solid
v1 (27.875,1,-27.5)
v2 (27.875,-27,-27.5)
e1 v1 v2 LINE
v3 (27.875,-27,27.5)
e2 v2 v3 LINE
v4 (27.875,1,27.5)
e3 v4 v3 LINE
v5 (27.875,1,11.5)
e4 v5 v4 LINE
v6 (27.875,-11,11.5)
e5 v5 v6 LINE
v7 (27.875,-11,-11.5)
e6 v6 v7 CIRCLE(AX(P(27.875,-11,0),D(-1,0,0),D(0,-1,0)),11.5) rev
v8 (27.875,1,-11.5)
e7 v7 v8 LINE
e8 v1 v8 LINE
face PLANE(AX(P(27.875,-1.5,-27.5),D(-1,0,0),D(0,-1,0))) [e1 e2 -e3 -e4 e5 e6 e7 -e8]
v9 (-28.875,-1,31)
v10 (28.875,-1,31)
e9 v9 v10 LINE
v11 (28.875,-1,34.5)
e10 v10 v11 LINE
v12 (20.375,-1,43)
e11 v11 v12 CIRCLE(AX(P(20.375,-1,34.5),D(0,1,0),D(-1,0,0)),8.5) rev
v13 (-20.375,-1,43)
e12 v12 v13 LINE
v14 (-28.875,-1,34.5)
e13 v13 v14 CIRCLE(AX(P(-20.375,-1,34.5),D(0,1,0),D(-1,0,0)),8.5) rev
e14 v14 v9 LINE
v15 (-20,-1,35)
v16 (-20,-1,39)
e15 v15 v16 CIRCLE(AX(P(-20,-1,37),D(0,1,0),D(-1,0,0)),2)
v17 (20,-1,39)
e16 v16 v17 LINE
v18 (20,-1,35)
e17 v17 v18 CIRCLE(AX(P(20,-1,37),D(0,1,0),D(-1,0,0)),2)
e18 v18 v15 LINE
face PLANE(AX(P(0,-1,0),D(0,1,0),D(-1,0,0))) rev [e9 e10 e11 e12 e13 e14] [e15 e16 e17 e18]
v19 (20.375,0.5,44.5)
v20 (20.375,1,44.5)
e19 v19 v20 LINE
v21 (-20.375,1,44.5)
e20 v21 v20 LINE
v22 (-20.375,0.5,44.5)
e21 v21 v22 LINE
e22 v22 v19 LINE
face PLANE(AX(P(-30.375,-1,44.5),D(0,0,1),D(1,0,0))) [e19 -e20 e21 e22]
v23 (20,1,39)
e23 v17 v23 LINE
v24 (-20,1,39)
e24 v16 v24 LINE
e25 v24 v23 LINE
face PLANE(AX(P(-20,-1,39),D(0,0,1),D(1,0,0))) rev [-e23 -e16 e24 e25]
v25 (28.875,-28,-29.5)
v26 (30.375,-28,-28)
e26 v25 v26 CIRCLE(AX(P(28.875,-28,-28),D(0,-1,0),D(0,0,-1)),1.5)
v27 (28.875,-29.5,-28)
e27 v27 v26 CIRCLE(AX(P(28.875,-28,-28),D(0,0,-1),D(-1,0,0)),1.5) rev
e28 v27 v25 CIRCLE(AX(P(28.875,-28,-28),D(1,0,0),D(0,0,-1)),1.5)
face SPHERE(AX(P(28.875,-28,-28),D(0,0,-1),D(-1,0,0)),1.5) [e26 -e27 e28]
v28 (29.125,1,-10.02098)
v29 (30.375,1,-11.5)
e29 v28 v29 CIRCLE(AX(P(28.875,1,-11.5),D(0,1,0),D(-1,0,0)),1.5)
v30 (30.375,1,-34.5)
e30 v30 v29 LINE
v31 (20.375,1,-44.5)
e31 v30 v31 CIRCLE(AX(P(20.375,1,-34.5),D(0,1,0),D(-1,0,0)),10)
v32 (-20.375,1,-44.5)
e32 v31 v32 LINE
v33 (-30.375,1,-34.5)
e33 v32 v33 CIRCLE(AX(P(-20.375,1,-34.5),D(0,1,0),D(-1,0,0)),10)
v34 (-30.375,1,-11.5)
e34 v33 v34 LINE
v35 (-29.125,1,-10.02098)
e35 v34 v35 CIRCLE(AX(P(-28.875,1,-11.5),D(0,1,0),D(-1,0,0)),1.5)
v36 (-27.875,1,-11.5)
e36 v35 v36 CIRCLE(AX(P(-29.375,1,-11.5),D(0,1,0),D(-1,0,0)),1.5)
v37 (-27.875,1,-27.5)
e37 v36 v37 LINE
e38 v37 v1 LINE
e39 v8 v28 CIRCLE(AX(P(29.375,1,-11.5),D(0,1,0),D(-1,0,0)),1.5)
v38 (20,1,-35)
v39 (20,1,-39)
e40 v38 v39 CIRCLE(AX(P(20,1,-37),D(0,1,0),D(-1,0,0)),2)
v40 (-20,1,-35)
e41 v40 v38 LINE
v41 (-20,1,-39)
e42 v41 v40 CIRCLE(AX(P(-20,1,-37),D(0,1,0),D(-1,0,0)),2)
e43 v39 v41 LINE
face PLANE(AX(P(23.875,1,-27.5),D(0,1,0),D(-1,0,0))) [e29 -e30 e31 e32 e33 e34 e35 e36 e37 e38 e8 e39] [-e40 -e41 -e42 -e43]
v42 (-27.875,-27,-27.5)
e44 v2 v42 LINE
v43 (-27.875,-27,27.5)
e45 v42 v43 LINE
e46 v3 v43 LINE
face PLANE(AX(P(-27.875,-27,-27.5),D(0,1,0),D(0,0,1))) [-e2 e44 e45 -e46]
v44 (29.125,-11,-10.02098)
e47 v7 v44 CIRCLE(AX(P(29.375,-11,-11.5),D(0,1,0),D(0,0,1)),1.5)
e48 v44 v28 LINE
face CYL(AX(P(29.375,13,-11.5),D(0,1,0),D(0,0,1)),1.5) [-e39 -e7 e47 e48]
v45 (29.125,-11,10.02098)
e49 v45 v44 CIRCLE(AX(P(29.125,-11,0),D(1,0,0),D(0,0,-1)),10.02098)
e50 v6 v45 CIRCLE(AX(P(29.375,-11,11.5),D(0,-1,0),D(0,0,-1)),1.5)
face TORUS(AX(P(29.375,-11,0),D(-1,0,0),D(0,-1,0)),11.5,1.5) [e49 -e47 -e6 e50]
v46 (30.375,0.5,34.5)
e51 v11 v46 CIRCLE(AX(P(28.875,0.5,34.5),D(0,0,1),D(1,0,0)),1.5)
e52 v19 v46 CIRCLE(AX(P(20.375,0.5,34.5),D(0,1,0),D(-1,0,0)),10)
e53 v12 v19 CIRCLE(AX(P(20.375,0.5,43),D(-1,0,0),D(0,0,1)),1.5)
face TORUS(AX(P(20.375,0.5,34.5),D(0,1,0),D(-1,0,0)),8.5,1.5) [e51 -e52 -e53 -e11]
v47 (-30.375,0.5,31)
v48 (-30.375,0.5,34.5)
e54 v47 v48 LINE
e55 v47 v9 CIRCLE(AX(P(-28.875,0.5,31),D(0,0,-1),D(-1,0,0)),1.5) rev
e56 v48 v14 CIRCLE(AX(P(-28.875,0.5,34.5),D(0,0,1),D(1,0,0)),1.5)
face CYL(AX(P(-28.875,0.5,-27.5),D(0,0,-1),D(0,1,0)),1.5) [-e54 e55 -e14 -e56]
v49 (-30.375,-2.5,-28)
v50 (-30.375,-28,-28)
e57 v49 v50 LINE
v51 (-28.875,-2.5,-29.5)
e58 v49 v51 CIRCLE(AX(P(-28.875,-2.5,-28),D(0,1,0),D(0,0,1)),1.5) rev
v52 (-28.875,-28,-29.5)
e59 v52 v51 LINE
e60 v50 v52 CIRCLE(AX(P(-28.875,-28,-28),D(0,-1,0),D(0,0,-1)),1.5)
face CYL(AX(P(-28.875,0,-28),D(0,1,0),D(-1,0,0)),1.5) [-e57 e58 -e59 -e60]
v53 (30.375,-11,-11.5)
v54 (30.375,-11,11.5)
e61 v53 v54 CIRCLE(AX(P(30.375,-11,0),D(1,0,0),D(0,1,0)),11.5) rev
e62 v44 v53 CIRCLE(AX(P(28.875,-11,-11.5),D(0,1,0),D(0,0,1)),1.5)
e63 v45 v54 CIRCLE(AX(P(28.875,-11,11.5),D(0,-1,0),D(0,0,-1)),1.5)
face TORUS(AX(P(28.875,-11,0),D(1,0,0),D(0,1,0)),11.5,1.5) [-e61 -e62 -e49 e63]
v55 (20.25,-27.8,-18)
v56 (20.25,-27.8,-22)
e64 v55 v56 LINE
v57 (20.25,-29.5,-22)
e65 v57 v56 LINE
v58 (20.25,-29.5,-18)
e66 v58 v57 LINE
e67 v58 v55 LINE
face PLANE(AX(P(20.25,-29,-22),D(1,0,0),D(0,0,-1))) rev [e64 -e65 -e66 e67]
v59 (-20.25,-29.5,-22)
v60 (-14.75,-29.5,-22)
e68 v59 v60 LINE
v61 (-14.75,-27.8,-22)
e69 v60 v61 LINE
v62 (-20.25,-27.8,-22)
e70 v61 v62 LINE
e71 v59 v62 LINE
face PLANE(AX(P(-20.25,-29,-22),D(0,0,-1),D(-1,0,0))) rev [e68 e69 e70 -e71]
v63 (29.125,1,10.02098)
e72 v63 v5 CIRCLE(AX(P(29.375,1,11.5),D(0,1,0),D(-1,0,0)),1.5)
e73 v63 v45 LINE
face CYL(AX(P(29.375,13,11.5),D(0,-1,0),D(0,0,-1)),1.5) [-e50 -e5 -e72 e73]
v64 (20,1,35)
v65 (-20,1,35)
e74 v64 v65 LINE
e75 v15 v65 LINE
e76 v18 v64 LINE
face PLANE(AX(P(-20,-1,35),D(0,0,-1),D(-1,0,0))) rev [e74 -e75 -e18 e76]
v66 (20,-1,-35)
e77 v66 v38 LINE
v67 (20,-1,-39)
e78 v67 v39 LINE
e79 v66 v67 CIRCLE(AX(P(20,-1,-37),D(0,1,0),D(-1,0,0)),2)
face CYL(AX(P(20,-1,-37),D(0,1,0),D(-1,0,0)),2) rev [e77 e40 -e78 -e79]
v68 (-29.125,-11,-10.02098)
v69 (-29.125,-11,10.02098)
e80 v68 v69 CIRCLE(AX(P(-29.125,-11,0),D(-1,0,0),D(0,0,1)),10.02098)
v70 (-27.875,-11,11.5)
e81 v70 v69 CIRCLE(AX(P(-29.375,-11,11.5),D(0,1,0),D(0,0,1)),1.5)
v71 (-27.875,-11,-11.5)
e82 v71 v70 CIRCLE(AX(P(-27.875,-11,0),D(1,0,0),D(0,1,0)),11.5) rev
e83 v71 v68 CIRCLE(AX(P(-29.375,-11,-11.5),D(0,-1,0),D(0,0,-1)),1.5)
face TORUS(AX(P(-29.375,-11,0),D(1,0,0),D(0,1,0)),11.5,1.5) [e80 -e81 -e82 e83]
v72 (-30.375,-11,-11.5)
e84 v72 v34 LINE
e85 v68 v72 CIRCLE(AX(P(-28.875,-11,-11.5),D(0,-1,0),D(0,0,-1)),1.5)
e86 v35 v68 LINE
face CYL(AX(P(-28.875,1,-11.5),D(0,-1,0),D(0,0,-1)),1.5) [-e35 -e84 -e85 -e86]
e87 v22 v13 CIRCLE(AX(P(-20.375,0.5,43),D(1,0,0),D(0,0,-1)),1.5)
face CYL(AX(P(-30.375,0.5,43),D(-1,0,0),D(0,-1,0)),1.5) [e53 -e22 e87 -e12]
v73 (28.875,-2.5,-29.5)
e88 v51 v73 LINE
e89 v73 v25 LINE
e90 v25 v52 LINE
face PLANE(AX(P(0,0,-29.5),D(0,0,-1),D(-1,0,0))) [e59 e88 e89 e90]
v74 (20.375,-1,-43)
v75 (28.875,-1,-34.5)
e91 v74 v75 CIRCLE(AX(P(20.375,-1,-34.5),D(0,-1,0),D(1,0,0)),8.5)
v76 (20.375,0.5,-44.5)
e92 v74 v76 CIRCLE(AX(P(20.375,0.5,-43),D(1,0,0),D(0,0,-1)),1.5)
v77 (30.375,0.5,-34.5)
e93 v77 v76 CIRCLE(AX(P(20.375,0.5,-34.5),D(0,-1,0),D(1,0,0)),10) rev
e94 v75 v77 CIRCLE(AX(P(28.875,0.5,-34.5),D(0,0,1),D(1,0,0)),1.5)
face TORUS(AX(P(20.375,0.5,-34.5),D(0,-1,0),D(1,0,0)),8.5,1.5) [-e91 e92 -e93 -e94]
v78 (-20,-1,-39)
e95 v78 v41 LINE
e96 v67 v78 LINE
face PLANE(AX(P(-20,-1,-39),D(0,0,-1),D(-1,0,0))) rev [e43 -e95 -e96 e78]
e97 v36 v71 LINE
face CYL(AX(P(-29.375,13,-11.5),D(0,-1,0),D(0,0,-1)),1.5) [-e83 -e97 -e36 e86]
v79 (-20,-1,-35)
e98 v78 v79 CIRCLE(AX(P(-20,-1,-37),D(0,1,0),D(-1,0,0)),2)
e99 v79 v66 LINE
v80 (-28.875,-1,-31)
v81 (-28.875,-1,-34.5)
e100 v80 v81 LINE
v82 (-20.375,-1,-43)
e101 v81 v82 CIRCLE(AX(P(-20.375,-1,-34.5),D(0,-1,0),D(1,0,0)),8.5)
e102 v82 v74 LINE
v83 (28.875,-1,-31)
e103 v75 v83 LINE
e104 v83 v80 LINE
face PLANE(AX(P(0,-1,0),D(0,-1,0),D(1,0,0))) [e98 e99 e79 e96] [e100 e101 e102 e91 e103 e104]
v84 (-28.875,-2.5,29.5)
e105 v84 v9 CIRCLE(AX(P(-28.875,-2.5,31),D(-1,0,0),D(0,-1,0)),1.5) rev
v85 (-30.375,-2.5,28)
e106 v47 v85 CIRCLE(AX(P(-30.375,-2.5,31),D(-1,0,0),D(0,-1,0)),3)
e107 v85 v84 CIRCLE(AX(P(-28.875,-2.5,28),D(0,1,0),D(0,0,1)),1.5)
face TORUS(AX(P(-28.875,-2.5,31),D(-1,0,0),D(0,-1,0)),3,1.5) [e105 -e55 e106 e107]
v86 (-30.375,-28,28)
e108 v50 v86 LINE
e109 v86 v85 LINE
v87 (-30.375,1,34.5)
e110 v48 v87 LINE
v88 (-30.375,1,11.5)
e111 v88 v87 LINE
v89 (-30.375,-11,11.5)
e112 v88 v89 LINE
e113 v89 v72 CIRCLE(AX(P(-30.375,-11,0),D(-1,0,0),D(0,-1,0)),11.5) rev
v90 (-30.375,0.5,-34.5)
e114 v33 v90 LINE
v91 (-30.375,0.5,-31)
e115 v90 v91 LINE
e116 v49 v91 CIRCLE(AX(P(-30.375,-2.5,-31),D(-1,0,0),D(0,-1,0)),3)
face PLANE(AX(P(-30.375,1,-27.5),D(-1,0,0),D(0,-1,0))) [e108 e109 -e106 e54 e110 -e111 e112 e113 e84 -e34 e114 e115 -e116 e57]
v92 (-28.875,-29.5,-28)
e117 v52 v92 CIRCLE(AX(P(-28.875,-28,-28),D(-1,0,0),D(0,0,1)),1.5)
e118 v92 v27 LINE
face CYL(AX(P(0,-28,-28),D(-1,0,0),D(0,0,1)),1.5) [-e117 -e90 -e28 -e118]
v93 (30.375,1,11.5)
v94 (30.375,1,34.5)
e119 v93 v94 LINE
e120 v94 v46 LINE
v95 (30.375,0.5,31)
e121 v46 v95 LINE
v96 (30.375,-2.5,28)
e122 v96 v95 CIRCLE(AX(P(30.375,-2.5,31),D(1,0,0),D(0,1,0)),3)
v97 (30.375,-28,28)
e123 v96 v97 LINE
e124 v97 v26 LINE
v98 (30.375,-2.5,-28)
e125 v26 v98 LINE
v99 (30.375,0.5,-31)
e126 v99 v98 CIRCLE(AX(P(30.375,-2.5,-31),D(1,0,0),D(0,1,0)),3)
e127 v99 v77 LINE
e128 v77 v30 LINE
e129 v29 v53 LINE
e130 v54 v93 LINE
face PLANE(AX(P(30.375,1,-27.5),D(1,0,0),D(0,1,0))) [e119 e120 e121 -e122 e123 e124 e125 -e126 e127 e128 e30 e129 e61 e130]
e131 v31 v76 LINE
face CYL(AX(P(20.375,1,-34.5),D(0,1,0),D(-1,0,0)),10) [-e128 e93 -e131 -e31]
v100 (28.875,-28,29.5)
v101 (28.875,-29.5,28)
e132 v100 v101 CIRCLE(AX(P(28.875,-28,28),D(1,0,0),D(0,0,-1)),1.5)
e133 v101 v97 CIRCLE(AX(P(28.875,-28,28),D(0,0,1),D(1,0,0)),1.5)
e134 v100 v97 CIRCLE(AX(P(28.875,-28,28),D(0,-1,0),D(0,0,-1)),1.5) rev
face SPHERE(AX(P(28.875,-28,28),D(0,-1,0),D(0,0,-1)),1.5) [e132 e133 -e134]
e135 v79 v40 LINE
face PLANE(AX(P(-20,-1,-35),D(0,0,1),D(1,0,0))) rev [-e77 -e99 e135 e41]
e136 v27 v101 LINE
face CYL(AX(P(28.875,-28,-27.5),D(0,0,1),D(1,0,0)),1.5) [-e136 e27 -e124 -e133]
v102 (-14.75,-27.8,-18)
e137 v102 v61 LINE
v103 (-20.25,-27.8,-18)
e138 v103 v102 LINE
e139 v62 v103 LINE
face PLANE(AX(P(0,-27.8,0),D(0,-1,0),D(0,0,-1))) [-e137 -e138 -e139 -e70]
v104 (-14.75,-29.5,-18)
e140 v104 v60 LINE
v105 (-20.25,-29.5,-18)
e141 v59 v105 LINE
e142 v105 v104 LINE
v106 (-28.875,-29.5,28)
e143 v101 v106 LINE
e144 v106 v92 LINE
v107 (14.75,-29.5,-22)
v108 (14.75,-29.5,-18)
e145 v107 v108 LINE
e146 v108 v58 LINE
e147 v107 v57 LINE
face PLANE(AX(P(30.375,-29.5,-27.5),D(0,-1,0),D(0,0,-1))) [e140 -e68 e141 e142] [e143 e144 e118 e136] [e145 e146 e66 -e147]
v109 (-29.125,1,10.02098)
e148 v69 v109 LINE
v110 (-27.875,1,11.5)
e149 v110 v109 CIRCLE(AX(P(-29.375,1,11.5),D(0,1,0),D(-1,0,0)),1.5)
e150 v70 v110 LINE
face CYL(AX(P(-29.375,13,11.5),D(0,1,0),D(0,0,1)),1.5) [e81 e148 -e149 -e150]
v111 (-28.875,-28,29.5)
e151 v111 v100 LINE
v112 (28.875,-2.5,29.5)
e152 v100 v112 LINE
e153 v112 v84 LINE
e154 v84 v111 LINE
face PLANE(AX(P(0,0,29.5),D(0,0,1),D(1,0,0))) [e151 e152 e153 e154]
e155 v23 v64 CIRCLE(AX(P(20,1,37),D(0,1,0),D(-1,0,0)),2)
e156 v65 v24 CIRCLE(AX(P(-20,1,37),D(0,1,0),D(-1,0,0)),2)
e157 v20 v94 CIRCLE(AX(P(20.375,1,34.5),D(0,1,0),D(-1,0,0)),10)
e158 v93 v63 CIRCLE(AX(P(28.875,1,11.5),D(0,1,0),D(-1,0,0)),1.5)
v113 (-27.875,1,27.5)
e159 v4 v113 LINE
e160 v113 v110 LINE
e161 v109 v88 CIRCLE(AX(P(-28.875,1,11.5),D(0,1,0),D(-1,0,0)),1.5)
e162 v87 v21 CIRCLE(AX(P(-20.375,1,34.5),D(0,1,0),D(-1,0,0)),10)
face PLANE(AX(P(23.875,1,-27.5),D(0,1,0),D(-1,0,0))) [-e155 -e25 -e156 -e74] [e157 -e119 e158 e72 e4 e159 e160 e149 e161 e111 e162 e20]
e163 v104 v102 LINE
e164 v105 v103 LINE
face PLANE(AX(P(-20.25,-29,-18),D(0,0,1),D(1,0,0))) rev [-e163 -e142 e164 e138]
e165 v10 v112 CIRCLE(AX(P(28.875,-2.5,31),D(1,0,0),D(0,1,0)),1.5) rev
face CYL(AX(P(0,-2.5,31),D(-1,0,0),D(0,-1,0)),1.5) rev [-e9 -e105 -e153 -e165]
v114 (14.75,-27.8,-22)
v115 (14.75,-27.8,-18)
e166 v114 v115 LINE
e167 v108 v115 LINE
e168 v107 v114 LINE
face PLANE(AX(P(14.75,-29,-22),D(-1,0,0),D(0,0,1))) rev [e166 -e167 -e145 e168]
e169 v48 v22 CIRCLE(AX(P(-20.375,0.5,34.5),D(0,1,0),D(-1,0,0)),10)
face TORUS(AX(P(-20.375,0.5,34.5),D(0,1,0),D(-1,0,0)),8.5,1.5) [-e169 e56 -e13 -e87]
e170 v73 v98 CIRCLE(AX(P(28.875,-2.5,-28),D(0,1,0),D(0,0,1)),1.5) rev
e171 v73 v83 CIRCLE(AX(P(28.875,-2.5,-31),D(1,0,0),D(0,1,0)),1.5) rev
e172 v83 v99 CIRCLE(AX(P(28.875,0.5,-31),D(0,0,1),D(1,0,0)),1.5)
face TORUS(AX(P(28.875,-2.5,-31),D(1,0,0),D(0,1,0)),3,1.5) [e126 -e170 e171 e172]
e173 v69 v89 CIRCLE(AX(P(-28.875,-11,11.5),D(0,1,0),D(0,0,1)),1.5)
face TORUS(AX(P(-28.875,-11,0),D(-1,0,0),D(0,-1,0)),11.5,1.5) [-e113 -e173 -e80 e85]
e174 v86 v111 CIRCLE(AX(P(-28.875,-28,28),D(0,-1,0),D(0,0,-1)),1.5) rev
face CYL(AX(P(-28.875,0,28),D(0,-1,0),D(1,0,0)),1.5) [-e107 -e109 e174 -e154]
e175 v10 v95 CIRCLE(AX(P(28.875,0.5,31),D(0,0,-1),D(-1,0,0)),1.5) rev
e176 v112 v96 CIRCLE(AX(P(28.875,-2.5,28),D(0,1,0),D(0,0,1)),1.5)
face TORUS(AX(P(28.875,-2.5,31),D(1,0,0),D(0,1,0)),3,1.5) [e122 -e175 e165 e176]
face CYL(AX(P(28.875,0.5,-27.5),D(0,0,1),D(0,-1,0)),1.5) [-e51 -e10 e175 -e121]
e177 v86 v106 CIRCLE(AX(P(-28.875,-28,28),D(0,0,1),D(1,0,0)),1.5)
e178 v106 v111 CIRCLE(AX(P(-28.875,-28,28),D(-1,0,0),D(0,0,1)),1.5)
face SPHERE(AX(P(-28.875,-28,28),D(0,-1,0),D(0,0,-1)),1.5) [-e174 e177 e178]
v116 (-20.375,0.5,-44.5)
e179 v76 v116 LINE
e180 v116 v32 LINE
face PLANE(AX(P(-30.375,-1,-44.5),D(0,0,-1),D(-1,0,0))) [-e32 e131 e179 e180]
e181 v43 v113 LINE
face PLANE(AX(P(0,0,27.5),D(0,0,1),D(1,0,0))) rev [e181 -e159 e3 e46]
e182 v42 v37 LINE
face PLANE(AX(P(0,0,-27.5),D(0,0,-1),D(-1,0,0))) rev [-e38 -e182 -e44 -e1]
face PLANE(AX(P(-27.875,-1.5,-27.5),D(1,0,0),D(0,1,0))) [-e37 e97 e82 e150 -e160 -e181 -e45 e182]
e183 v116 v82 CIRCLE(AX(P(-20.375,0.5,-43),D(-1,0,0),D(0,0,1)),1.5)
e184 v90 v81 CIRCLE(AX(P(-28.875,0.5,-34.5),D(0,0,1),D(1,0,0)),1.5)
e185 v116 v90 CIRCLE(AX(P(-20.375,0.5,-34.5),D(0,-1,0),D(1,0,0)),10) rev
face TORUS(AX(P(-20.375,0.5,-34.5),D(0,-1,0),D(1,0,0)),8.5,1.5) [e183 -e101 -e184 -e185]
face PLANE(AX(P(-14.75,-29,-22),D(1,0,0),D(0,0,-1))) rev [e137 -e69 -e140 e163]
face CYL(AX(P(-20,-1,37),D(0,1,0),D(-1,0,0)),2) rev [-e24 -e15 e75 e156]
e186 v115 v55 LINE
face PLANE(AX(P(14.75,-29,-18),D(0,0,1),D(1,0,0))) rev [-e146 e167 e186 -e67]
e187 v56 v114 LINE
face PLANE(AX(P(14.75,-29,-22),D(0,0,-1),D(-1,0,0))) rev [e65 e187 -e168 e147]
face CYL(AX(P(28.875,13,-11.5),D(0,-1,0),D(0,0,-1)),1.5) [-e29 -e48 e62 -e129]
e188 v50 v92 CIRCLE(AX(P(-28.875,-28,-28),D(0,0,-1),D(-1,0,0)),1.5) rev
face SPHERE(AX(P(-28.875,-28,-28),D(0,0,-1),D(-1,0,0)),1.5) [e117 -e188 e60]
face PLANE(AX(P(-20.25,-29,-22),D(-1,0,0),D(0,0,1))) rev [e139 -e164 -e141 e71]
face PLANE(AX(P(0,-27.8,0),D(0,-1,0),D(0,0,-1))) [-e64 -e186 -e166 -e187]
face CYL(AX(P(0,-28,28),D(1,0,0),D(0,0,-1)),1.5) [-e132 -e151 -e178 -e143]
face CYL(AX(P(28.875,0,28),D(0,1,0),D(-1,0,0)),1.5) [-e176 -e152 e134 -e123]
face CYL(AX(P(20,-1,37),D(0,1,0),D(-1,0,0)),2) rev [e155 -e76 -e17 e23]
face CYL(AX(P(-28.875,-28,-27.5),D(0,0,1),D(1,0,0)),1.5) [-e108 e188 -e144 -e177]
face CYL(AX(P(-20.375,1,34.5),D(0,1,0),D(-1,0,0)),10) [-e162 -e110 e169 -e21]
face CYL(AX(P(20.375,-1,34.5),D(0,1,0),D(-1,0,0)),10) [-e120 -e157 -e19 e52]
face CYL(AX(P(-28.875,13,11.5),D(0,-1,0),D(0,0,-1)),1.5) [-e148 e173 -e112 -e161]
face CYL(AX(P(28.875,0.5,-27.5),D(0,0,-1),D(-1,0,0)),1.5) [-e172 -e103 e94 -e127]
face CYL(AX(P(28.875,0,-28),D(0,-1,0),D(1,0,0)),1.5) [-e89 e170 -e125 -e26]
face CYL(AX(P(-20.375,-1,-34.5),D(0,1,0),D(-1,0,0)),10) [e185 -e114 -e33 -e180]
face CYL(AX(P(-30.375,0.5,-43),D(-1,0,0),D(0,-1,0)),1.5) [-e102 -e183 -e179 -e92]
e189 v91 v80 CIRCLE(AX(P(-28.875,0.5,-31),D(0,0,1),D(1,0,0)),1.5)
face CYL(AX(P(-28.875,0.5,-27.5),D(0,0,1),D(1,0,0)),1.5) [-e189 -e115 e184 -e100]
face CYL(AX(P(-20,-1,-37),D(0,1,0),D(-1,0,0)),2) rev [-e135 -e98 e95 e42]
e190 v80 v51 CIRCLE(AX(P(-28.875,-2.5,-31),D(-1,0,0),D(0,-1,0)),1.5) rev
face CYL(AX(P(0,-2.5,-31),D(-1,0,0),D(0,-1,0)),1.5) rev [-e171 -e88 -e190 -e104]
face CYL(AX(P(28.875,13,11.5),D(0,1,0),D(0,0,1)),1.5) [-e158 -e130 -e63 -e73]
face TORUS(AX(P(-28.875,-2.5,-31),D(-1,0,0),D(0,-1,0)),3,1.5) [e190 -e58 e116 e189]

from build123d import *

# Parameters (mm, degrees)
BOSS_EXTRUDE1_DEPTH      = 27.5
BOSS_EXTRUDE1_DEPTH_BACK = 27.5
SKETCH3_W                = 60.75
SKETCH3_H                = 30.5
BOSS_EXTRUDE2_DEPTH      = 2
SKETCH4_W                = 55.75
SKETCH4_H                = 55
CUT_EXTRUDE1_DEPTH       = 50
SKETCH5_W                = 60.75
SKETCH5_H                = 30.5
BOSS_EXTRUDE3_DEPTH      = 2
SKETCH7_W                = 5.5
SKETCH7_H                = 4
CUT_EXTRUDE2_DEPTH       = 2
SKETCH8_W                = 60.75
SKETCH8_H                = 15
BOSS_EXTRUDE5_DEPTH      = 2
FILLET2_R                = 10
CUT_EXTRUDE3_DEPTH       = 62.425895394
CUT_EXTRUDE3_DEPTH_BACK  = 62.425895394
SKETCH10_W               = 5.5
SKETCH10_H               = 5.017361003
CUT_EXTRUDE4_DEPTH       = 4
DELETEFACE1_START        = -29
DELETEFACE1_OUTLINE_W    = 5.5
DELETEFACE1_OUTLINE_H    = 4
DELETEFACE1_DEPTH        = 2
SKETCH11_W               = 46.425527042
SKETCH11_H               = 17.437880889
BOSS_EXTRUDE6_DEPTH      = 0.8
FILLET3_R                = 1.5


# Read off the part's stored shape, not the designer's step: DeleteFace1
with BuildPart() as part:
    # Sketch2 → Boss-Extrude1 (new, two sides: drawn at the far end of the back side and taken through both)
    with BuildSketch(Plane.XY.offset(-BOSS_EXTRUDE1_DEPTH_BACK)):
        Polygon((-23.875, -1.5), (-27.875, -1.5), (-27.875, -27), (0, -27), (27.875, -27), (27.875, -1.5), (23.875, -1.5), (23.875, 1), (30.375, 1), (30.375, -29.5), (0, -29.5), (-30.375, -29.5), (-30.375, 1), (-23.875, 1), align=None)
    extrude(amount=BOSS_EXTRUDE1_DEPTH + BOSS_EXTRUDE1_DEPTH_BACK)

    # Sketch3 → Boss-Extrude2 (add)
    with BuildSketch(Plane(origin=(0, 0, -27.5), x_dir=(-1, 0, 0), z_dir=(0, 0, -1))):
        with Locations((0, -14.25)):
            Rectangle(SKETCH3_W, SKETCH3_H)
    extrude(amount=BOSS_EXTRUDE2_DEPTH)

    # Sketch4 → Cut-Extrude1 (cut)
    with BuildSketch(Plane(origin=(0, -27, 0), x_dir=(1, 0, 0), z_dir=(0, 1, 0))):
        Rectangle(SKETCH4_W, SKETCH4_H)
    extrude(amount=CUT_EXTRUDE1_DEPTH, mode=Mode.SUBTRACT)

    # Sketch5 → Boss-Extrude3 (add)
    with BuildSketch(Plane.XY.offset(27.5)):
        with Locations((0, -14.25)):
            Rectangle(SKETCH5_W, SKETCH5_H)
    extrude(amount=BOSS_EXTRUDE3_DEPTH)

    # Sketch7 → Cut-Extrude2 (cut)
    with BuildSketch(Plane(origin=(0, -27, 0), x_dir=(1, 0, 0), z_dir=(0, 1, 0))):
        with Locations((0, 20)):
            Rectangle(SKETCH7_W, SKETCH7_H)
        with Locations((17.5, 20)):
            Rectangle(SKETCH7_W, SKETCH7_H)
        with Locations((-17.5, 20)):
            Rectangle(SKETCH7_W, SKETCH7_H)
    extrude(amount=-CUT_EXTRUDE2_DEPTH, mode=Mode.SUBTRACT)

    # Sketch8 → Boss-Extrude5 (add)
    # profile 1 of 2: a face of its own
    with BuildSketch(Plane(origin=(0, 1, 0), x_dir=(1, 0, 0), z_dir=(0, 1, 0))):
        with Locations((0, 37)):
            Rectangle(SKETCH8_W, SKETCH8_H)
        with BuildLine():
            Line((-20, 39), (20, 39))
            ThreePointArc((20, 39), (22, 37), (20, 35))
            Line((20, 35), (-20, 35))
            ThreePointArc((-20, 35), (-22, 37), (-20, 39))
        make_face(mode=Mode.SUBTRACT)
    # profile 2 of 2: a face of its own
    with BuildSketch(Plane(origin=(0, 1, 0), x_dir=(1, 0, 0), z_dir=(0, 1, 0))):
        with Locations((0, -37)):
            Rectangle(SKETCH8_W, SKETCH8_H)
        with BuildLine():
            Line((-20, -35), (20, -35))
            ThreePointArc((20, -35), (22, -37), (20, -39))
            Line((20, -39), (-20, -39))
            ThreePointArc((-20, -39), (-22, -37), (-20, -35))
        make_face(mode=Mode.SUBTRACT)
    extrude(amount=-BOSS_EXTRUDE5_DEPTH)

    # Fillet2
    fillet2_edges = [part.edges().sort_by_distance(p)[0] for p in [
        (-30.375, 0, -44.5),
        (30.375, 0, -44.5),
        (-30.375, 0, 44.5),
        (30.375, 0, 44.5),
    ]]
    fillet(fillet2_edges, radius=FILLET2_R)

    # Sketch9 → Cut-Extrude3 (cut, two sides: drawn at the far end of the back side and taken through both)
    with BuildSketch(Plane(origin=(0, 0, 0), x_dir=(0, 0, -1), z_dir=(1, 0, 0)).offset(-CUT_EXTRUDE3_DEPTH_BACK)):
        with BuildLine():
            Line((10, 13), (10, -11))
            ThreePointArc((10, -11), (0, -21), (-10, -11))
            Line((-10, -11), (-10, 13))
            ThreePointArc((-10, 13), (0, 23), (10, 13))
        make_face()
    extrude(amount=CUT_EXTRUDE3_DEPTH + CUT_EXTRUDE3_DEPTH_BACK, mode=Mode.SUBTRACT)

    # Sketch10 → Cut-Extrude4 (cut)
    with BuildSketch(Plane(origin=(0, 0, -18), x_dir=(-1, 0, 0), z_dir=(0, 0, -1))):
        with Locations((17.5, -30.308680501)):
            Rectangle(SKETCH10_W, SKETCH10_H)
        with Locations((-17.5, -30.308680501)):
            Rectangle(SKETCH10_W, SKETCH10_H)
    extrude(amount=CUT_EXTRUDE4_DEPTH, mode=Mode.SUBTRACT)

    # DeleteFace1 outline → DeleteFace1 (add)
    with BuildSketch(Plane(origin=(0, 0, 0), x_dir=(1, 0, 0), z_dir=(0, 1, 0)).offset(DELETEFACE1_START)):
        with Locations((0, 20)):
            Rectangle(DELETEFACE1_OUTLINE_W, DELETEFACE1_OUTLINE_H)
    extrude(amount=DELETEFACE1_DEPTH)

    # Sketch11 → Boss-Extrude6 (add)
    with BuildSketch(Plane(origin=(0, -27, 0), x_dir=(1, 0, 0), z_dir=(0, 1, 0))):
        with Locations((0, 15.626153005)):
            Rectangle(SKETCH11_W, SKETCH11_H)
    extrude(amount=-BOSS_EXTRUDE6_DEPTH)

    # Fillet3
    # the kernel refuses this fillet: 1.5 mm, written as the material it adds along each edge
    with BuildSketch(Plane(origin=(-30.375, -1, 29.5), x_dir=(0, 0, 1), z_dir=(1, 0, 0)), Plane(origin=(-30.375, -1, -29.5), x_dir=(0, -1, 0), z_dir=(1, 0, 0))) as fillet3_piece_1:
        with BuildLine():
            CenterArc((FILLET3_R, FILLET3_R), FILLET3_R, 180, 90)
            Line((0, FILLET3_R), (0, 0))
            Line((0, 0), (FILLET3_R, 0))
        make_face()
    extrude(amount=60.75)
    # the kernel refuses this fillet: 1.5 mm, written as the material it takes off along each edge
    with BuildSketch(Plane(origin=(-30.375, -29.5, -33.25), x_dir=(0, 1, 0), z_dir=(0, 0, 1)), Plane(origin=(30.375, -29.5, 33.25), x_dir=(0, 1, 0), z_dir=(0, 0, -1))) as fillet3_2_piece_1:
        with BuildLine():
            CenterArc((FILLET3_R, -FILLET3_R), FILLET3_R, 90, 90)
            Line((0, -FILLET3_R), (0, 0))
            Line((0, 0), (FILLET3_R, 0))
        make_face()
    extrude(amount=66.5, mode=Mode.SUBTRACT)
    with BuildSketch(Plane(origin=(34.125, -29.5, 29.5), x_dir=(0, 1, 0), z_dir=(-1, 0, 0))) as fillet3_2_piece_2:
        with BuildLine():
            CenterArc((FILLET3_R, FILLET3_R), FILLET3_R, 180, 90)
            Line((0, FILLET3_R), (0, 0))
            Line((0, 0), (FILLET3_R, 0))
        make_face()
    extrude(amount=68.25, mode=Mode.SUBTRACT)
    with BuildSketch(Plane(origin=(-34.125, -29.5, -29.5), x_dir=(0, 0, 1), z_dir=(1, 0, 0))) as fillet3_2_piece_3:
        with BuildLine():
            CenterArc((FILLET3_R, -FILLET3_R), FILLET3_R, 90, 90)
            Line((0, -FILLET3_R), (0, 0))
            Line((0, 0), (FILLET3_R, 0))
        make_face()
    extrude(amount=68.25, mode=Mode.SUBTRACT)
    with BuildSketch(Plane(origin=(-30.375, -11, 10), x_dir=(0, 0, 1), z_dir=(0, 1, 0)), Plane(origin=(-30.375, 4.75, -10), x_dir=(0, 0, -1), z_dir=(0, -1, 0)), Plane(origin=(30.375, -11, -10), x_dir=(0, 0, -1), z_dir=(0, 1, 0)), Plane(origin=(-27.875, -11, -10), x_dir=(0, 0, -1), z_dir=(0, 1, 0)), Plane(origin=(27.875, 4.75, -10), x_dir=(0, 0, -1), z_dir=(0, -1, 0)), Plane(origin=(27.875, -11, 10), x_dir=(0, 0, 1), z_dir=(0, 1, 0))) as fillet3_2_piece_4:
        with BuildLine():
            CenterArc((FILLET3_R, FILLET3_R), FILLET3_R, 180, 90)
            Line((0, FILLET3_R), (0, 0))
            Line((0, 0), (FILLET3_R, 0))
        make_face()
    extrude(amount=15.75, mode=Mode.SUBTRACT)
    with BuildSketch(Plane(origin=(30.375, 4.75, 10), x_dir=(-1, 0, 0), z_dir=(0, -1, 0)), Plane(origin=(-27.875, 4.75, 10), x_dir=(-1, 0, 0), z_dir=(0, -1, 0))) as fillet3_2_piece_5:
        with BuildLine():
            CenterArc((FILLET3_R, -FILLET3_R), FILLET3_R, 90, 90)
            Line((0, -FILLET3_R), (0, 0))
            Line((0, 0), (FILLET3_R, 0))
        make_face()
    extrude(amount=15.75, mode=Mode.SUBTRACT)
    with BuildSketch(Plane(origin=(-30.375, -11, 0), x_dir=(0, 0, -1), z_dir=(0, 1, 0))) as fillet3_2_piece_6:
        with BuildLine():
            CenterArc((10 + FILLET3_R, -FILLET3_R), FILLET3_R, 90, 90)
            Line((10, -FILLET3_R), (10, 0))
            Line((10, 0), (10 + FILLET3_R, 0))
        make_face()
    revolve(axis=Axis((-30.375, -11, 0), (-1, 0, 0)), revolution_arc=180, mode=Mode.SUBTRACT)
    with BuildSketch(Plane(origin=(30.375, -11, 0), x_dir=(0, 0, -1), z_dir=(0, 1, 0))) as fillet3_2_piece_7:
        with BuildLine():
            CenterArc((10 + FILLET3_R, FILLET3_R), FILLET3_R, 180, 90)
            Line((10, FILLET3_R), (10, 0))
            Line((10, 0), (10 + FILLET3_R, 0))
        make_face()
    revolve(axis=Axis((30.375, -11, 0), (-1, 0, 0)), revolution_arc=180, mode=Mode.SUBTRACT)
    with BuildSketch(Plane(origin=(-27.875, -11, 0), x_dir=(0, 0, -1), z_dir=(0, 1, 0))) as fillet3_2_piece_8:
        with BuildLine():
            CenterArc((10 + FILLET3_R, FILLET3_R), FILLET3_R, 180, 90)
            Line((10, FILLET3_R), (10, 0))
            Line((10, 0), (10 + FILLET3_R, 0))
        make_face()
    revolve(axis=Axis((-27.875, -11, 0), (-1, 0, 0)), revolution_arc=180, mode=Mode.SUBTRACT)
    with BuildSketch(Plane(origin=(27.875, -11, 0), x_dir=(0, 0, -1), z_dir=(0, 1, 0))) as fillet3_2_piece_9:
        with BuildLine():
            CenterArc((10 + FILLET3_R, -FILLET3_R), FILLET3_R, 90, 90)
            Line((10, -FILLET3_R), (10, 0))
            Line((10, 0), (10 + FILLET3_R, 0))
        make_face()
    revolve(axis=Axis((27.875, -11, 0), (-1, 0, 0)), revolution_arc=180, mode=Mode.SUBTRACT)
    # the kernel refuses this fillet: 1.5 mm, written as the material it takes off along each edge
    with BuildSketch(Plane(origin=(28.875, -28, -28), x_dir=(0, 0, -1), z_dir=(1, 0, 0))) as fillet3_3_piece_1_section:
        Polygon((0, 0), (FILLET3_R, 0), (FILLET3_R, -FILLET3_R), (0, -FILLET3_R), align=None)
    fillet3_3_piece_1 = extrude(amount=FILLET3_R, mode=Mode.PRIVATE)
    fillet3_3_piece_1 = fillet3_3_piece_1 - Plane(origin=(28.875, -28, -28), x_dir=(0, 0.7071067811865475, 0.7071067811865475), z_dir=(1, 0, 0)) * Sphere(FILLET3_R, mode=Mode.PRIVATE)
    add(fillet3_3_piece_1, mode=Mode.SUBTRACT)
    with BuildSketch(Plane(origin=(28.875, -28, 28), x_dir=(0, 0, 1), z_dir=(1, 0, 0))) as fillet3_3_piece_2_section:
        Polygon((0, 0), (FILLET3_R, 0), (FILLET3_R, FILLET3_R), (0, FILLET3_R), align=None)
    fillet3_3_piece_2 = extrude(amount=FILLET3_R, mode=Mode.PRIVATE)
    fillet3_3_piece_2 = fillet3_3_piece_2 - Plane(origin=(28.875, -28, 28), x_dir=(0, 0.7071067811865475, -0.7071067811865475), z_dir=(1, 0, 0)) * Sphere(FILLET3_R, mode=Mode.PRIVATE)
    add(fillet3_3_piece_2, mode=Mode.SUBTRACT)
    with BuildSketch(Plane(origin=(-28.875, -28, -28), x_dir=(0, 0, -1), z_dir=(-1, 0, 0))) as fillet3_3_piece_3_section:
        Polygon((0, 0), (FILLET3_R, 0), (FILLET3_R, FILLET3_R), (0, FILLET3_R), align=None)
    fillet3_3_piece_3 = extrude(amount=FILLET3_R, mode=Mode.PRIVATE)
    fillet3_3_piece_3 = fillet3_3_piece_3 - Plane(origin=(-28.875, -28, -28), x_dir=(0, 0.7071067811865475, 0.7071067811865475), z_dir=(-1, 0, 0)) * Sphere(FILLET3_R, mode=Mode.PRIVATE)
    add(fillet3_3_piece_3, mode=Mode.SUBTRACT)
    with BuildSketch(Plane(origin=(-28.875, -28, 28), x_dir=(0, 0, 1), z_dir=(-1, 0, 0))) as fillet3_3_piece_4_section:
        Polygon((0, 0), (FILLET3_R, 0), (FILLET3_R, -FILLET3_R), (0, -FILLET3_R), align=None)
    fillet3_3_piece_4 = extrude(amount=FILLET3_R, mode=Mode.PRIVATE)
    fillet3_3_piece_4 = fillet3_3_piece_4 - Plane(origin=(-28.875, -28, 28), x_dir=(0, 0.7071067811865475, -0.7071067811865475), z_dir=(-1, 0, 0)) * Sphere(FILLET3_R, mode=Mode.PRIVATE)
    add(fillet3_3_piece_4, mode=Mode.SUBTRACT)
    with BuildSketch(Plane(origin=(20.375, -1, 44.5), x_dir=(0, 1, 0), z_dir=(-1, 0, 0)), Plane(origin=(20.375, -1, -44.5), x_dir=(0, 0, 1), z_dir=(-1, 0, 0))) as fillet3_3_piece_5:
        with BuildLine():
            CenterArc((FILLET3_R, FILLET3_R), FILLET3_R, 180, 90)
            Line((0, FILLET3_R), (0, 0))
            Line((0, 0), (FILLET3_R, 0))
        make_face()
    extrude(amount=40.75, mode=Mode.SUBTRACT)
    with BuildSketch(Plane(origin=(-20.375, -1, 34.5), x_dir=(-1, 0, 0), z_dir=(0, 0, -1))) as fillet3_3_piece_6:
        with BuildLine():
            CenterArc((10 - FILLET3_R, FILLET3_R), FILLET3_R, 270, 90)
            Line((10 - FILLET3_R, 0), (10, 0))
            Line((10, 0), (10, FILLET3_R))
        make_face()
    revolve(axis=Axis((-20.375, -1, 34.5), (0, 1, 0)), revolution_arc=90, mode=Mode.SUBTRACT)
    with BuildSketch(Plane(origin=(-20.375, -1, -34.5), x_dir=(-1, 0, 0), z_dir=(0, 0, 1))) as fillet3_3_piece_7:
        with BuildLine():
            CenterArc((10 - FILLET3_R, -FILLET3_R), FILLET3_R, 0, 90)
            Line((10, -FILLET3_R), (10, 0))
            Line((10, 0), (10 - FILLET3_R, 0))
        make_face()
    revolve(axis=Axis((-20.375, -1, -34.5), (0, -1, 0)), revolution_arc=90, mode=Mode.SUBTRACT)
    with BuildSketch(Plane(origin=(20.375, -1, 34.5), x_dir=(1, 0, 0), z_dir=(0, 0, -1))) as fillet3_3_piece_8:
        with BuildLine():
            CenterArc((10 - FILLET3_R, -FILLET3_R), FILLET3_R, 0, 90)
            Line((10 - FILLET3_R, 0), (10, 0))
            Line((10, 0), (10, -FILLET3_R))
        make_face()
    revolve(axis=Axis((20.375, -1, 34.5), (0, -1, 0)), revolution_arc=90, mode=Mode.SUBTRACT)
    with BuildSketch(Plane(origin=(-30.375, -1, 34.5), x_dir=(0, 1, 0), z_dir=(0, 0, -1)), Plane(origin=(30.375, -1, 31), x_dir=(0, 1, 0), z_dir=(0, 0, 1))) as fillet3_3_piece_9:
        with BuildLine():
            CenterArc((FILLET3_R, FILLET3_R), FILLET3_R, 180, 90)
            Line((0, FILLET3_R), (0, 0))
            Line((0, 0), (FILLET3_R, 0))
        make_face()
    extrude(amount=3.5, mode=Mode.SUBTRACT)
    with BuildSketch(Plane(origin=(-30.375, -1, -34.5), x_dir=(0, 1, 0), z_dir=(0, 0, 1)), Plane(origin=(30.375, -1, -31), x_dir=(0, 1, 0), z_dir=(0, 0, -1))) as fillet3_3_piece_10:
        with BuildLine():
            CenterArc((FILLET3_R, -FILLET3_R), FILLET3_R, 90, 90)
            Line((0, -FILLET3_R), (0, 0))
            Line((0, 0), (FILLET3_R, 0))
        make_face()
    extrude(amount=3.5, mode=Mode.SUBTRACT)
    with BuildSketch(Plane(origin=(20.375, -1, -34.5), x_dir=(0, 0, -1), z_dir=(-1, 0, 0))) as fillet3_3_piece_11:
        with BuildLine():
            CenterArc((10 - FILLET3_R, -FILLET3_R), FILLET3_R, 0, 90)
            Line((10, -FILLET3_R), (10, 0))
            Line((10, 0), (10 - FILLET3_R, 0))
        make_face()
    revolve(axis=Axis((20.375, -1, -34.5), (0, -1, 0)), revolution_arc=90, mode=Mode.SUBTRACT)
    with BuildSketch(Plane(origin=(-30.375, -28, 29.5), x_dir=(0, 0, -1), z_dir=(0, 1, 0)), Plane(origin=(-30.375, -2.5, -29.5), x_dir=(0, 0, 1), z_dir=(0, -1, 0)), Plane(origin=(30.375, -2.5, 29.5), x_dir=(0, 0, -1), z_dir=(0, -1, 0)), Plane(origin=(30.375, -28, -29.5), x_dir=(0, 0, 1), z_dir=(0, 1, 0))) as fillet3_3_piece_12:
        with BuildLine():
            CenterArc((FILLET3_R, -FILLET3_R), FILLET3_R, 90, 90)
            Line((0, -FILLET3_R), (0, 0))
            Line((0, 0), (FILLET3_R, 0))
        make_face()
    extrude(amount=25.5, mode=Mode.SUBTRACT)
    with BuildSketch(Plane(origin=(30.375, -2.5, -31), x_dir=(0, 0, 1), z_dir=(0, -1, 0))) as fillet3_3_piece_13:
        with BuildLine():
            CenterArc((1.5 + FILLET3_R, FILLET3_R), FILLET3_R, 180, 90)
            Line((1.5, FILLET3_R), (1.5, 0))
            Line((1.5, 0), (1.5 + FILLET3_R, 0))
        make_face()
    revolve(axis=Axis((30.375, -2.5, -31), (-1, 0, 0)), revolution_arc=90, mode=Mode.SUBTRACT)
    with BuildSketch(Plane(origin=(30.375, -2.5, 31), x_dir=(0, 1, 0), z_dir=(0, 0, 1))) as fillet3_3_piece_14:
        with BuildLine():
            CenterArc((1.5 + FILLET3_R, FILLET3_R), FILLET3_R, 180, 90)
            Line((1.5, FILLET3_R), (1.5, 0))
            Line((1.5, 0), (1.5 + FILLET3_R, 0))
        make_face()
    revolve(axis=Axis((30.375, -2.5, 31), (-1, 0, 0)), revolution_arc=90, mode=Mode.SUBTRACT)
    with BuildSketch(Plane(origin=(-30.375, -2.5, -31), x_dir=(0, 0, 1), z_dir=(0, -1, 0))) as fillet3_3_piece_15:
        with BuildLine():
            CenterArc((1.5 + FILLET3_R, -FILLET3_R), FILLET3_R, 90, 90)
            Line((1.5, -FILLET3_R), (1.5, 0))
            Line((1.5, 0), (1.5 + FILLET3_R, 0))
        make_face()
    revolve(axis=Axis((-30.375, -2.5, -31), (-1, 0, 0)), revolution_arc=90, mode=Mode.SUBTRACT)
    with BuildSketch(Plane(origin=(-30.375, -2.5, 31), x_dir=(0, 1, 0), z_dir=(0, 0, 1))) as fillet3_3_piece_16:
        with BuildLine():
            CenterArc((1.5 + FILLET3_R, -FILLET3_R), FILLET3_R, 90, 90)
            Line((1.5, -FILLET3_R), (1.5, 0))
            Line((1.5, 0), (1.5 + FILLET3_R, 0))
        make_face()
    revolve(axis=Axis((-30.375, -2.5, 31), (-1, 0, 0)), revolution_arc=90, mode=Mode.SUBTRACT)


solid = part.part
